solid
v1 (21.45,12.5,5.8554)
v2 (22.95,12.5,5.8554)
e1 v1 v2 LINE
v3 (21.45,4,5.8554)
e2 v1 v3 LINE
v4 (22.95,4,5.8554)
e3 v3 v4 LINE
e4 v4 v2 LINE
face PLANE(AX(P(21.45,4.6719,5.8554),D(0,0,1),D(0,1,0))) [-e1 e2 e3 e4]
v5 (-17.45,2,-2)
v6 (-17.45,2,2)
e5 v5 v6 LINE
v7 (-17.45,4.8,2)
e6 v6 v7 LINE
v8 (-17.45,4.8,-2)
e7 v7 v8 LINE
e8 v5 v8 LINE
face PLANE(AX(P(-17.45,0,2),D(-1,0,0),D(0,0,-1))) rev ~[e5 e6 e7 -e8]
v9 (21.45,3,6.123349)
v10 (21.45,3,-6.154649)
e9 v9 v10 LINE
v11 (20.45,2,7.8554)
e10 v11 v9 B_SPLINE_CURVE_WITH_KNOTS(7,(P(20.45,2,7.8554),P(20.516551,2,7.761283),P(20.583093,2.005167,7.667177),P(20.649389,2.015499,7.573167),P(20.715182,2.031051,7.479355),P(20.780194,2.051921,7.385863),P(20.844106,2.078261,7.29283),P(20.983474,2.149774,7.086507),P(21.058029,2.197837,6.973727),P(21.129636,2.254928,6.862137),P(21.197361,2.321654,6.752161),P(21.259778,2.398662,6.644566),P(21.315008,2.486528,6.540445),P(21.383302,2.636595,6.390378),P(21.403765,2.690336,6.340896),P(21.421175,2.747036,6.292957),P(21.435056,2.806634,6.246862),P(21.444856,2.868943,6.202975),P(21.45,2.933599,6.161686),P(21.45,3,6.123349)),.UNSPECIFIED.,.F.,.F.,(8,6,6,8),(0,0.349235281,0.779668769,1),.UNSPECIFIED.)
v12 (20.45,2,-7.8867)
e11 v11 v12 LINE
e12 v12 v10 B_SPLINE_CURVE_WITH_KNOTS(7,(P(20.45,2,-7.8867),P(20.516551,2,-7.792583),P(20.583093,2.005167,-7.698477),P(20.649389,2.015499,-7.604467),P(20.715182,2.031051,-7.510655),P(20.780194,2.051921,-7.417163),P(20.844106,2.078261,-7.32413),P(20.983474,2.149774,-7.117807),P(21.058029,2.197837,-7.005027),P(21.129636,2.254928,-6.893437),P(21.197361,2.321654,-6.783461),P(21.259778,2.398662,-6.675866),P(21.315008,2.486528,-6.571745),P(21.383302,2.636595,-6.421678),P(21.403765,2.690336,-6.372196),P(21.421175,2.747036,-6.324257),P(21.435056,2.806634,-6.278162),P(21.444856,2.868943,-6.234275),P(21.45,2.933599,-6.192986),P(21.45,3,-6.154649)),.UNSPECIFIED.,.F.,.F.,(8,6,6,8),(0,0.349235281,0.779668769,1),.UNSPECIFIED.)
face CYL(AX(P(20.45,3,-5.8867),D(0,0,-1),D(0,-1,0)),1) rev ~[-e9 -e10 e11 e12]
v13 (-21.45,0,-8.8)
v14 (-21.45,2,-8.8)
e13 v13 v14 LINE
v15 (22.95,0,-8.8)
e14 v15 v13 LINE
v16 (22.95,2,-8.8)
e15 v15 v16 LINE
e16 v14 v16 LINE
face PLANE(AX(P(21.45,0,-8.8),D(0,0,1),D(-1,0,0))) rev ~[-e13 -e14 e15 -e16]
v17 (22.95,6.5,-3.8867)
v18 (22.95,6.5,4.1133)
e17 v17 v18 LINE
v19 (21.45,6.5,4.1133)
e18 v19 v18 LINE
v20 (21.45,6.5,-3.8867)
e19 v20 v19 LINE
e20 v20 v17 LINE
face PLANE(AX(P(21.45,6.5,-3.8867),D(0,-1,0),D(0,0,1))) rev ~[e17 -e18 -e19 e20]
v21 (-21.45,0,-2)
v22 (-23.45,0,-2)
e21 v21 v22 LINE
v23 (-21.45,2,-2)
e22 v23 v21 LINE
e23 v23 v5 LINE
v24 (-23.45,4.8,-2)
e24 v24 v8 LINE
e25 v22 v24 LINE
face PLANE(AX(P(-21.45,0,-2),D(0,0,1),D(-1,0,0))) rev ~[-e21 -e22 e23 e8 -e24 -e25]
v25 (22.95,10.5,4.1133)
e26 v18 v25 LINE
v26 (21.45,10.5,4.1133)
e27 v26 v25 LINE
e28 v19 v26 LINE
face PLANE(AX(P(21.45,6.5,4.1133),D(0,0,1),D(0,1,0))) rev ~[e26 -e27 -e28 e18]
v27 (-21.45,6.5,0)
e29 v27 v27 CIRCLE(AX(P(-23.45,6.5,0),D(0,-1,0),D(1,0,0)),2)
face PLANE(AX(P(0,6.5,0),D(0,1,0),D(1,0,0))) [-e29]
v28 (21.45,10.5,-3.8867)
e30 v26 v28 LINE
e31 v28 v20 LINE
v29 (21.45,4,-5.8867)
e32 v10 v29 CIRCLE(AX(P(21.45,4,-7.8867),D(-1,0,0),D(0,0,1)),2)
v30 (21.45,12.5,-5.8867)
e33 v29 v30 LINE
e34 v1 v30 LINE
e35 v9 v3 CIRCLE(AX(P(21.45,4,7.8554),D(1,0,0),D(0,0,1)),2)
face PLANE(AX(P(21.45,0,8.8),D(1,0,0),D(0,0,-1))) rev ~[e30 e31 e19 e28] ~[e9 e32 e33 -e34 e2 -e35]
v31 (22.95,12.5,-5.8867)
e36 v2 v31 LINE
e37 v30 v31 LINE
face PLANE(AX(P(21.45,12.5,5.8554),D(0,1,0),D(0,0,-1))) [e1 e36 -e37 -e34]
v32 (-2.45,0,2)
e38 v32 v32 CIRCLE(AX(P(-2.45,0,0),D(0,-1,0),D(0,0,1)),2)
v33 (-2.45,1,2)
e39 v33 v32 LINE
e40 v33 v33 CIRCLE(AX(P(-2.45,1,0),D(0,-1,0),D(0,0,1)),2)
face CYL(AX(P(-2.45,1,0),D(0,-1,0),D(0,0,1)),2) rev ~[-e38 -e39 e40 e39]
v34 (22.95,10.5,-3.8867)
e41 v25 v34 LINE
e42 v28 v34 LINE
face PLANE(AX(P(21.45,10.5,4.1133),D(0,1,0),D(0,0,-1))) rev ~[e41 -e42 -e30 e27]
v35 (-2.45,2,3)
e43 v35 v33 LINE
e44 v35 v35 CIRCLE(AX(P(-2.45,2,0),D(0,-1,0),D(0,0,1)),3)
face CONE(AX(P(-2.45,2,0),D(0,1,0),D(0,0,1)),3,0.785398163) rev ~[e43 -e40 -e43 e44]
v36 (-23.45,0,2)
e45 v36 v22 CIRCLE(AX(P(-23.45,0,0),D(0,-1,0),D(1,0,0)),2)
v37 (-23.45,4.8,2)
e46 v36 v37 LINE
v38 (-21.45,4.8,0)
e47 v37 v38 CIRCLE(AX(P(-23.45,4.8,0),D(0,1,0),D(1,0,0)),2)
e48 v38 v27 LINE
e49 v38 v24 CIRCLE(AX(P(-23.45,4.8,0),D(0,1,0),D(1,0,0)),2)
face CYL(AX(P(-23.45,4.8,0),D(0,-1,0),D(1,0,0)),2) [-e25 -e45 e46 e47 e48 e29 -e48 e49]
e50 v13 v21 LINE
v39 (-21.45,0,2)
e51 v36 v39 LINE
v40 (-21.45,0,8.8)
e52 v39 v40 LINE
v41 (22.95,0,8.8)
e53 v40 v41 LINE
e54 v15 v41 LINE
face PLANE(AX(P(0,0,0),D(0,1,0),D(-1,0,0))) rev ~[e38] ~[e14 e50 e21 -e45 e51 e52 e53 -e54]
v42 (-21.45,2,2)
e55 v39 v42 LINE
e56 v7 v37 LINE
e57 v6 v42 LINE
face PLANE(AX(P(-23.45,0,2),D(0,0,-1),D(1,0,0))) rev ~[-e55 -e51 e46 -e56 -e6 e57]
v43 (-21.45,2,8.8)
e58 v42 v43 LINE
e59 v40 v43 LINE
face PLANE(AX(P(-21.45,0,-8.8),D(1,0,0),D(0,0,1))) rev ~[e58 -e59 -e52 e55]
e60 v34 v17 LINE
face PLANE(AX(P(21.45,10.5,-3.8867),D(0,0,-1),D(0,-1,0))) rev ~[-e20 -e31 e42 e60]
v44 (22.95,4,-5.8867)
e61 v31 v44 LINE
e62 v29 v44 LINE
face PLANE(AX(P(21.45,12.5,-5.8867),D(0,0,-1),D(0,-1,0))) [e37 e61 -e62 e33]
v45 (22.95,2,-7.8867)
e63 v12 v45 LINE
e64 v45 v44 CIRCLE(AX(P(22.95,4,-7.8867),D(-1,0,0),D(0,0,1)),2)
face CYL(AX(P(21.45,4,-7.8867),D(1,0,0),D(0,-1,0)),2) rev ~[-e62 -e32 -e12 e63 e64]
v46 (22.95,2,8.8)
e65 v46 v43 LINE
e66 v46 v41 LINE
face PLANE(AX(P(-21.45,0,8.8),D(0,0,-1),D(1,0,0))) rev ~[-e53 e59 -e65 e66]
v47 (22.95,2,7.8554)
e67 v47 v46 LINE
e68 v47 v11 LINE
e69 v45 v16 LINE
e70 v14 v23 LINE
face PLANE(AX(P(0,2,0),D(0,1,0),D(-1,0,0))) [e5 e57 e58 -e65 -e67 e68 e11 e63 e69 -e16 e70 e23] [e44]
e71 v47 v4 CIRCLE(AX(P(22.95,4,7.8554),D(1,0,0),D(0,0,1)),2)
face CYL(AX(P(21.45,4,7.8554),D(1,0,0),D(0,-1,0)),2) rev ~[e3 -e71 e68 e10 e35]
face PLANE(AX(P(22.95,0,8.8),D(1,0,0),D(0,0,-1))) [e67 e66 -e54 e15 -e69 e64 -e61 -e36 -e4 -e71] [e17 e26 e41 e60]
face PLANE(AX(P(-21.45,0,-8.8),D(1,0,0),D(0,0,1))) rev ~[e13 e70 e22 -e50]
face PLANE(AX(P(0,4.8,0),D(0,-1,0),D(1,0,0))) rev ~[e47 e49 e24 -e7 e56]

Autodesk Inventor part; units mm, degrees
ref_plane "YZ Plane" through (0, 0, 0) normal (1, 0, 0) x (0, 1, 0)
ref_plane "XZ Plane" through (0, 0, 0) normal (0, 1, 0) x (-1, 0, 0)
ref_plane "XY Plane" through (0, 0, 0) normal (0, 0, 1) x (1, 0, 0)
sketch "Esquisse1" plane through (0, 0, 0) normal (0, 1, 0) x (-1, 0, 0)
  line L0 (21.45, 8.8) -> (-21.45, 8.8)
  line L1 (-21.45, 8.8) -> (-21.45, -8.8)
  line L2 (-21.45, -8.8) -> (21.45, -8.8)
  line L3 (21.45, -8.8) -> (21.45, 8.8)
  line L4 (21.45, 8.8) -> (-21.45, -8.8) construction
  line L5 (-21.45, 8.8) -> (21.45, -8.8) construction
  point P0 (0, 0)
  dimension "d0" = 42.9
  dimension "d1" = 17.6
extrude "Extrusion1" add sketch "Esquisse1" along normal blind 2
sketch "Esquisse2" plane through (21.45, 0, 8.8) normal (1, 0, 0) x (0, 0, -1)
  line L0 (4.6867, 10.5) -> (12.6867, 10.5)
  line L1 (12.6867, 10.5) -> (12.6867, 6.5)
  line L2 (12.6867, 6.5) -> (4.6867, 6.5)
  line L3 (4.6867, 6.5) -> (4.6867, 10.5)
  line L4 (4.6867, 10.5) -> (12.6867, 6.5) construction
  line L5 (12.6867, 10.5) -> (4.6867, 6.5) construction
  line L6 (2.9446, 12.5) -> (14.6867, 12.5)
  line L7 (14.6867, 12.5) -> (14.6867, 4.3203)
  line L8 (2.9446, 4.6719) -> (2.9446, 12.5)
  line L9 (2.9446, 12.5) -> (14.6867, 4.3203) construction
  line L10 (14.6867, 12.5) -> (2.9446, 4.6719) construction
  line L11 (0, 2) -> (17.6, 2) projected
  line L12 (2.9446, 4.6719) -> (2.9446, 0)
  line L13 (0, 0) -> (17.6, 0) projected
  line L14 (14.6867, 4.3203) -> (14.6867, 0)
  line L15 (2.9446, 0) -> (14.6867, 0)
  point P0 (8.8, 0)
  point P1 (8.6867, 8.5)
  point P2 (8.6867, 8.5)
  dimension "d4" = 4.5
  dimension "d6" = 2
  dimension "d7" = 8
  dimension "d8" = 4
extrude "Extrusion2" add sketch "Esquisse2" along normal blind 1.5
sketch "Esquisse4" plane through (0, 2, 0) normal (0, 1, 0) x (1, 0, 0)
  line L0 (-21.45, 8.8) -> (-21.45, -8.8) projected
  point P0 (0, 0)
  point P1 (-2.45, 0)
  dimension "d18" = 19
hole "Perçage2" at (-2.45, 2, 0) direction (0, -1, 0) diameter 4 end through all countersink diameter 6 countersink angle 90
sketch "Esquisse5" plane through (21.45, 0, 8.8) normal (1, 0, 0) x (0, 0, -1)
  line L0 (0, 0) -> (2.9446, 0) projected
  line L1 (2.9446, 2) -> (14.6867, 2) projected
  line L2 (0, 0) -> (2.9446, 0)
  line L3 (2.9446, 0) -> (2.9446, 2)
  line L4 (2.9446, 2) -> (0, 2)
  line L5 (0, 2) -> (0, 0)
  line L6 (2.9446, 0) -> (14.6867, 0) projected
  line L7 (14.6867, 2) -> (17.6, 2) projected
  line L8 (14.6867, 0) -> (17.6, 0)
  line L9 (17.6, 0) -> (17.6, 2)
  line L10 (17.6, 2) -> (14.6867, 2)
  line L11 (14.6867, 2) -> (14.6867, 0)
  point P0 (8.8, 0)
extrude "Extrusion3" add sketch "Esquisse5" along normal up to surface (1.5 mm away) contours L5 L4 L3 L0 | L11 L7 L9 L8
fillet "Congé1" radius 2 2 edges at (22.2, 2, 5.8554) (22.2, 2, -5.8867)
fillet "Congé2" radius 1 1 edges at (21.45, 2, -0.0157)
sketch "Esquisse6" plane through (0, 0, 0) normal (0, -1, 0) x (1, 0, 0)
  circle A0 centre (-23.45, 0) radius 2
  line L0 (-21.45, -8.8) -> (-21.45, 8.8) projected
  line L1 (-23.45, 2) -> (-17.45, 2)
  line L2 (-17.45, 2) -> (-17.45, -2)
  line L3 (-17.45, -2) -> (-23.45, -2)
  line L4 (0, 0) -> (4.0498, 0)
  dimension "d30" = 4
  dimension "d31" = 4
extrude "Extrusion4" add sketch "Esquisse6" against normal blind 4.8
sketch "Esquisse7" plane through (0, 4.8, 0) normal (0, 1, 0) x (1, 0, 0)
  circle A0 centre (-23.45, 0) radius 2
  arc A1 (-23.45, 2) -> (-23.45, -2) centre (-23.45, 0) ccw projected
  point P0 (0, 0)
extrude "Extrusion5" add sketch "Esquisse7" along normal blind 1.7
equation "\"d6\" = d5"
equation "\"d5\" = 2"
properties part number "arduino_holder"
